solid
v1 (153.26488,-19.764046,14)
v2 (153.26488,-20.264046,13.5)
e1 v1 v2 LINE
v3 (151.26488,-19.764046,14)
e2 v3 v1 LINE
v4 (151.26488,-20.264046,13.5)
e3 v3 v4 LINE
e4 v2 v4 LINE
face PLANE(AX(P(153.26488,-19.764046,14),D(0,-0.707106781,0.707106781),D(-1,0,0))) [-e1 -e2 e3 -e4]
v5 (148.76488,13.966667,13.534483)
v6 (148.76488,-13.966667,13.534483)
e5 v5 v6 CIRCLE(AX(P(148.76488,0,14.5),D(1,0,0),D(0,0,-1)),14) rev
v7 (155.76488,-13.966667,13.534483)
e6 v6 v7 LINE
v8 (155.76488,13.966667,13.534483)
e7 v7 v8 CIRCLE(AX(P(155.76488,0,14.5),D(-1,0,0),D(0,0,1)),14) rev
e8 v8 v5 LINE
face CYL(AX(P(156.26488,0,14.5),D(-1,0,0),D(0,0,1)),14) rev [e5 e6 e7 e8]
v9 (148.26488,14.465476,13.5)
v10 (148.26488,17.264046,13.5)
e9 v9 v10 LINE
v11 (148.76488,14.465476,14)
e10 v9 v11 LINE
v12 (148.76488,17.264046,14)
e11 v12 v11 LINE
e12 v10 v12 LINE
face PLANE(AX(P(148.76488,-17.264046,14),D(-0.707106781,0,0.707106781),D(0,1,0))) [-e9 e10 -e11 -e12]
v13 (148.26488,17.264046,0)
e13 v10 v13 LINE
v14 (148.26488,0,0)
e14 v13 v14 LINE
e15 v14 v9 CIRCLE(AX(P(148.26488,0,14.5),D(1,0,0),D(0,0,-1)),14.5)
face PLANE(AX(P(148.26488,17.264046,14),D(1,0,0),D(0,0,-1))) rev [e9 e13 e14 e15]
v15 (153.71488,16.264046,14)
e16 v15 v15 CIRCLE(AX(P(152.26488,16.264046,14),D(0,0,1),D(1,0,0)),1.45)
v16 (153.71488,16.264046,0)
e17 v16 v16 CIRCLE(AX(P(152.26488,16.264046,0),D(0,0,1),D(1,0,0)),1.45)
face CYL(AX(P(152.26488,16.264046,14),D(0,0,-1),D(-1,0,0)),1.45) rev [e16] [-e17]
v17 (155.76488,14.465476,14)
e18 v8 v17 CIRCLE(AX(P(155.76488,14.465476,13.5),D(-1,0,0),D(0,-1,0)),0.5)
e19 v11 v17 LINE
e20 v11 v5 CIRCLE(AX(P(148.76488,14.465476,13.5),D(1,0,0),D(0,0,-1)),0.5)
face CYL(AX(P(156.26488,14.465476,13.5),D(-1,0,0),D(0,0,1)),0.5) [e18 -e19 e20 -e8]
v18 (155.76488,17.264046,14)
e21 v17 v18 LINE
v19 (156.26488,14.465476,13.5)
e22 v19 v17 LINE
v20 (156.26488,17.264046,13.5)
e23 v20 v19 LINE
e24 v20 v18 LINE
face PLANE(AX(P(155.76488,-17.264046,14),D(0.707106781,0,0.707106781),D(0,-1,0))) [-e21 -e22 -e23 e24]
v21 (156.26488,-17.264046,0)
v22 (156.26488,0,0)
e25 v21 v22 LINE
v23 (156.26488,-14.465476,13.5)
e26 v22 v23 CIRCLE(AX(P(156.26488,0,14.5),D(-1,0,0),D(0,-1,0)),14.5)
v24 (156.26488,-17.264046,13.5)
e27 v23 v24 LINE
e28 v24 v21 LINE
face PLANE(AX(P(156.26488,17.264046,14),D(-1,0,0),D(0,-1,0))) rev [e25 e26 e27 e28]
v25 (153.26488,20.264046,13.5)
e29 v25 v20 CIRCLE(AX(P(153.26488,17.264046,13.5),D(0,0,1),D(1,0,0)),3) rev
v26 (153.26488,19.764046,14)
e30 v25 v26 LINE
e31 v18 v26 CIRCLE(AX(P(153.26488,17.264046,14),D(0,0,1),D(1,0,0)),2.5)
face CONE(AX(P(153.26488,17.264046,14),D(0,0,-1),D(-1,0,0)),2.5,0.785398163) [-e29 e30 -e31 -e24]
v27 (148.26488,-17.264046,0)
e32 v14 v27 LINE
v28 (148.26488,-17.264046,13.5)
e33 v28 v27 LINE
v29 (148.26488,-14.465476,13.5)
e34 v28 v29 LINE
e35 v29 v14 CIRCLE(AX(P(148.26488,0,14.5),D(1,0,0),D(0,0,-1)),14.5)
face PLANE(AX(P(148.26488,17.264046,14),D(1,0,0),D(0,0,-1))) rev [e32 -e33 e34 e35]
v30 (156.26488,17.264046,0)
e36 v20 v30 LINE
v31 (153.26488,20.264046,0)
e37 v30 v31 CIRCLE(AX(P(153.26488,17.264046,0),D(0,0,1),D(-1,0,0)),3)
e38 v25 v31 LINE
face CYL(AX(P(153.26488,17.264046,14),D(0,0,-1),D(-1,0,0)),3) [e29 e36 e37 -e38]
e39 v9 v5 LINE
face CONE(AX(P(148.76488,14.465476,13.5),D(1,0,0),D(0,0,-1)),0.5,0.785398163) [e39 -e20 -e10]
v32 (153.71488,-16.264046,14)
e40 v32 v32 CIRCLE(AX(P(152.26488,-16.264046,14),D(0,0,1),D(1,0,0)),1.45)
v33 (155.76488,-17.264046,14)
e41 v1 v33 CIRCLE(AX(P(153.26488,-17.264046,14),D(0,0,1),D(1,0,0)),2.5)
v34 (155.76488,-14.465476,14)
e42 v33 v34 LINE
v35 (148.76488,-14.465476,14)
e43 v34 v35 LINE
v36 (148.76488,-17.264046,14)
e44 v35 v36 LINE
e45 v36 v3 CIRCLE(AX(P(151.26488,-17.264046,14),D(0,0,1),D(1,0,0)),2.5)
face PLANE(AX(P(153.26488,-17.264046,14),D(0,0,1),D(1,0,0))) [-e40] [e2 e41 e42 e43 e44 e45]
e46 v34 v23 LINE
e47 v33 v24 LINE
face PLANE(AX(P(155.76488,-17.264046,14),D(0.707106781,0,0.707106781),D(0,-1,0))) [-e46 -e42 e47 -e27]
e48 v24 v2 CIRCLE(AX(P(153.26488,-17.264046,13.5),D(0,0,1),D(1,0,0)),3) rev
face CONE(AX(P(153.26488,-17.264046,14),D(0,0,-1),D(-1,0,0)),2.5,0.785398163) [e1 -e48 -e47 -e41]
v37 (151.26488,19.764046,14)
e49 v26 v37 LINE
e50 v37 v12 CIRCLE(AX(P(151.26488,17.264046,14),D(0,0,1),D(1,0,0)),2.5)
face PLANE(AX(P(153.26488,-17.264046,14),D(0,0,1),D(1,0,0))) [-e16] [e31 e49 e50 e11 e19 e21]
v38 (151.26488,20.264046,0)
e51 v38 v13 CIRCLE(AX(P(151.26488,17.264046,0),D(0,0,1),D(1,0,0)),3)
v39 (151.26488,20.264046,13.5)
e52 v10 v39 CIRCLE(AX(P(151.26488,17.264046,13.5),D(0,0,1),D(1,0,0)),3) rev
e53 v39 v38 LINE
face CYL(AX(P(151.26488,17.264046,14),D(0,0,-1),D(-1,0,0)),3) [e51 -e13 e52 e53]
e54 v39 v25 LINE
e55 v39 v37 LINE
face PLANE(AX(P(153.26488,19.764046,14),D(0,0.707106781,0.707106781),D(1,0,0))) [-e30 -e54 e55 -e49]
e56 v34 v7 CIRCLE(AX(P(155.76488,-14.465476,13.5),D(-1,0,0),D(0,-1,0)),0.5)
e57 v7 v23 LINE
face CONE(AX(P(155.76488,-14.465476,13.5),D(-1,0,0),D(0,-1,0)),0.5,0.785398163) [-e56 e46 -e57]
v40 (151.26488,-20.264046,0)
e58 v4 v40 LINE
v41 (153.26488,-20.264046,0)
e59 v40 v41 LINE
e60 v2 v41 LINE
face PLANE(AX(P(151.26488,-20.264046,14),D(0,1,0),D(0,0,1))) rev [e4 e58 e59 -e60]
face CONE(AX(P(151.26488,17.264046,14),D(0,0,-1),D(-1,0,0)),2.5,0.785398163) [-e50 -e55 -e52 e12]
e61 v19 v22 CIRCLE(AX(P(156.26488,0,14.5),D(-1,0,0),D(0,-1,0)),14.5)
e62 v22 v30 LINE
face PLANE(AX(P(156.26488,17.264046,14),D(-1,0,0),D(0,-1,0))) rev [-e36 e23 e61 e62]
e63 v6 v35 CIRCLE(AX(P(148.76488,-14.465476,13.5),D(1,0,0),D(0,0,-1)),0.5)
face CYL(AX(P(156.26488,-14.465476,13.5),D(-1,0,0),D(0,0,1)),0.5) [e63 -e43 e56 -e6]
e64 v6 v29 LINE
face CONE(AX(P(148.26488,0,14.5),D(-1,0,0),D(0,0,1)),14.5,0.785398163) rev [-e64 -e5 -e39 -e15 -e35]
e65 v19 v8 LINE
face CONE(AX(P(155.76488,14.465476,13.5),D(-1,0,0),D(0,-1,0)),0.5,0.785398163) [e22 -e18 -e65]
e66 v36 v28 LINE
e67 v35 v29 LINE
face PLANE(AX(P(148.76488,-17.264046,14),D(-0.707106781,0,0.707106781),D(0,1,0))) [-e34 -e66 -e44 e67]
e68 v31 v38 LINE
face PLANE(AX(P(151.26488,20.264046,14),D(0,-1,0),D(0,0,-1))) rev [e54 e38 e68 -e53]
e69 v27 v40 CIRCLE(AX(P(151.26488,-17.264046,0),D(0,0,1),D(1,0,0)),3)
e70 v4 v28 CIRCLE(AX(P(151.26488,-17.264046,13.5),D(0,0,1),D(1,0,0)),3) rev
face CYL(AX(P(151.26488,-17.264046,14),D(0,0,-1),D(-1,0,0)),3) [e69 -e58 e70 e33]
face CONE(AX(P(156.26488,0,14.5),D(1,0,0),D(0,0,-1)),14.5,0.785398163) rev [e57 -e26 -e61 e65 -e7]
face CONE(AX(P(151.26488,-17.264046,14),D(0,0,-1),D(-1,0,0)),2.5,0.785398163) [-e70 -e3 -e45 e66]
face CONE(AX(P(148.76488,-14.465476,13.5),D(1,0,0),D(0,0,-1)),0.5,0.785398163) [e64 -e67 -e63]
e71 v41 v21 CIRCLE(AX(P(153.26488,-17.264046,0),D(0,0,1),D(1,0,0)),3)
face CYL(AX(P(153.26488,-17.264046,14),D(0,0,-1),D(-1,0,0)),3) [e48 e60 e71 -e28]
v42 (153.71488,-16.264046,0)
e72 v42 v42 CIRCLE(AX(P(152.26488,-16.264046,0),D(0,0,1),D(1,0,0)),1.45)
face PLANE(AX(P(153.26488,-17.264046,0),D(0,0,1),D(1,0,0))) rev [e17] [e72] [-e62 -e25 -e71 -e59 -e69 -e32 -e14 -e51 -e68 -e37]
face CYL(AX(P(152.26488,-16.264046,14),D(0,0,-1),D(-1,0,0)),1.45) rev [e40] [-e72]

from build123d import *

# Parameters (mm, degrees)
SKETCH_1_R               = 1.45
EXTRUDE_1_DEPTH          = 14
CUT_EXTRUDE_1_DEPTH      = 26.896554891
CUT_EXTRUDE_1_DEPTH_BACK = 26.896554891
SKETCH_2_R               = 14
FILLET_1_R               = 0.5
CHAMFER_1_SIZE           = 0.5


with BuildPart() as part:
    # 草图1 → 凸台-拉伸1 (new body)
    with BuildSketch(Plane.XY):
        with BuildLine():
            Line((151.264880132, 20.264045876), (153.264880132, 20.264045876))
            ThreePointArc((153.264880132, 20.264045876), (155.386200475, 19.385366219), (156.264880132, 17.264045876))
            Line((156.264880132, 17.264045876), (156.264880132, -17.264045876))
            ThreePointArc((156.264880132, -17.264045876), (155.386200475, -19.385366219), (153.264880132, -20.264045876))
            Line((153.264880132, -20.264045876), (151.264880132, -20.264045876))
            ThreePointArc((151.264880132, -20.264045876), (149.143559788, -19.385366219), (148.264880132, -17.264045876))
            Line((148.264880132, -17.264045876), (148.264880132, 17.264045876))
            ThreePointArc((148.264880132, 17.264045876), (149.143559788, 19.385366219), (151.264880132, 20.264045876))
        make_face()
        with Locations((152.264880132, 16.264045876)):
            Circle(SKETCH_1_R, mode=Mode.SUBTRACT)
        with Locations((152.264880132, -16.264045876)):
            Circle(SKETCH_1_R, mode=Mode.SUBTRACT)
    extrude(amount=EXTRUDE_1_DEPTH)

    # 草图2 → 切除-拉伸1 (cut, two sides: drawn at the far end of the back side and taken through both)
    with BuildSketch(Plane.ZY.offset(-148.264880132).offset(-CUT_EXTRUDE_1_DEPTH_BACK)):
        with Locations((14.5, 0)):
            Circle(SKETCH_2_R)
    extrude(amount=CUT_EXTRUDE_1_DEPTH + CUT_EXTRUDE_1_DEPTH_BACK, mode=Mode.SUBTRACT)

    # 圆角1
    fillet_1_edges = [part.edges().sort_by_distance(p)[0] for p in [
        (152.264880132, 13.99106858, 14),
        (152.264880132, -13.99106858, 14),
    ]]
    fillet(fillet_1_edges, radius=FILLET_1_R)

    # 倒角1
    chamfer_1_edges = [part.edges().sort_by_distance(p)[0] for p in [
        (155.386200475, 19.385366219, 14),
        (152.264880132, 20.264045876, 14),
        (149.143559788, 19.385366219, 14),
        (148.264880132, 15.864761009, 14),
        (149.143559788, -19.385366219, 14),
        (152.264880132, -20.264045876, 14),
        (148.264880132, 0, 0.5),
        (156.264880132, 0, 0.5),
        (156.264880132, 15.864761009, 14),
        (156.264880132, 14.124332022, 13.865541639),
        (156.264880132, -14.124332022, 13.865541639),
        (148.264880132, -15.864761009, 14),
        (148.264880132, 14.124332022, 13.865541639),
        (148.264880132, -14.124332022, 13.865541639),
        (155.386200475, -19.385366219, 14),
        (156.264880132, -15.864761009, 14),
    ]]
    chamfer(chamfer_1_edges, length=CHAMFER_1_SIZE - 0.0001)  # a hair under: the kernel refuses the full size


solid = part.part
